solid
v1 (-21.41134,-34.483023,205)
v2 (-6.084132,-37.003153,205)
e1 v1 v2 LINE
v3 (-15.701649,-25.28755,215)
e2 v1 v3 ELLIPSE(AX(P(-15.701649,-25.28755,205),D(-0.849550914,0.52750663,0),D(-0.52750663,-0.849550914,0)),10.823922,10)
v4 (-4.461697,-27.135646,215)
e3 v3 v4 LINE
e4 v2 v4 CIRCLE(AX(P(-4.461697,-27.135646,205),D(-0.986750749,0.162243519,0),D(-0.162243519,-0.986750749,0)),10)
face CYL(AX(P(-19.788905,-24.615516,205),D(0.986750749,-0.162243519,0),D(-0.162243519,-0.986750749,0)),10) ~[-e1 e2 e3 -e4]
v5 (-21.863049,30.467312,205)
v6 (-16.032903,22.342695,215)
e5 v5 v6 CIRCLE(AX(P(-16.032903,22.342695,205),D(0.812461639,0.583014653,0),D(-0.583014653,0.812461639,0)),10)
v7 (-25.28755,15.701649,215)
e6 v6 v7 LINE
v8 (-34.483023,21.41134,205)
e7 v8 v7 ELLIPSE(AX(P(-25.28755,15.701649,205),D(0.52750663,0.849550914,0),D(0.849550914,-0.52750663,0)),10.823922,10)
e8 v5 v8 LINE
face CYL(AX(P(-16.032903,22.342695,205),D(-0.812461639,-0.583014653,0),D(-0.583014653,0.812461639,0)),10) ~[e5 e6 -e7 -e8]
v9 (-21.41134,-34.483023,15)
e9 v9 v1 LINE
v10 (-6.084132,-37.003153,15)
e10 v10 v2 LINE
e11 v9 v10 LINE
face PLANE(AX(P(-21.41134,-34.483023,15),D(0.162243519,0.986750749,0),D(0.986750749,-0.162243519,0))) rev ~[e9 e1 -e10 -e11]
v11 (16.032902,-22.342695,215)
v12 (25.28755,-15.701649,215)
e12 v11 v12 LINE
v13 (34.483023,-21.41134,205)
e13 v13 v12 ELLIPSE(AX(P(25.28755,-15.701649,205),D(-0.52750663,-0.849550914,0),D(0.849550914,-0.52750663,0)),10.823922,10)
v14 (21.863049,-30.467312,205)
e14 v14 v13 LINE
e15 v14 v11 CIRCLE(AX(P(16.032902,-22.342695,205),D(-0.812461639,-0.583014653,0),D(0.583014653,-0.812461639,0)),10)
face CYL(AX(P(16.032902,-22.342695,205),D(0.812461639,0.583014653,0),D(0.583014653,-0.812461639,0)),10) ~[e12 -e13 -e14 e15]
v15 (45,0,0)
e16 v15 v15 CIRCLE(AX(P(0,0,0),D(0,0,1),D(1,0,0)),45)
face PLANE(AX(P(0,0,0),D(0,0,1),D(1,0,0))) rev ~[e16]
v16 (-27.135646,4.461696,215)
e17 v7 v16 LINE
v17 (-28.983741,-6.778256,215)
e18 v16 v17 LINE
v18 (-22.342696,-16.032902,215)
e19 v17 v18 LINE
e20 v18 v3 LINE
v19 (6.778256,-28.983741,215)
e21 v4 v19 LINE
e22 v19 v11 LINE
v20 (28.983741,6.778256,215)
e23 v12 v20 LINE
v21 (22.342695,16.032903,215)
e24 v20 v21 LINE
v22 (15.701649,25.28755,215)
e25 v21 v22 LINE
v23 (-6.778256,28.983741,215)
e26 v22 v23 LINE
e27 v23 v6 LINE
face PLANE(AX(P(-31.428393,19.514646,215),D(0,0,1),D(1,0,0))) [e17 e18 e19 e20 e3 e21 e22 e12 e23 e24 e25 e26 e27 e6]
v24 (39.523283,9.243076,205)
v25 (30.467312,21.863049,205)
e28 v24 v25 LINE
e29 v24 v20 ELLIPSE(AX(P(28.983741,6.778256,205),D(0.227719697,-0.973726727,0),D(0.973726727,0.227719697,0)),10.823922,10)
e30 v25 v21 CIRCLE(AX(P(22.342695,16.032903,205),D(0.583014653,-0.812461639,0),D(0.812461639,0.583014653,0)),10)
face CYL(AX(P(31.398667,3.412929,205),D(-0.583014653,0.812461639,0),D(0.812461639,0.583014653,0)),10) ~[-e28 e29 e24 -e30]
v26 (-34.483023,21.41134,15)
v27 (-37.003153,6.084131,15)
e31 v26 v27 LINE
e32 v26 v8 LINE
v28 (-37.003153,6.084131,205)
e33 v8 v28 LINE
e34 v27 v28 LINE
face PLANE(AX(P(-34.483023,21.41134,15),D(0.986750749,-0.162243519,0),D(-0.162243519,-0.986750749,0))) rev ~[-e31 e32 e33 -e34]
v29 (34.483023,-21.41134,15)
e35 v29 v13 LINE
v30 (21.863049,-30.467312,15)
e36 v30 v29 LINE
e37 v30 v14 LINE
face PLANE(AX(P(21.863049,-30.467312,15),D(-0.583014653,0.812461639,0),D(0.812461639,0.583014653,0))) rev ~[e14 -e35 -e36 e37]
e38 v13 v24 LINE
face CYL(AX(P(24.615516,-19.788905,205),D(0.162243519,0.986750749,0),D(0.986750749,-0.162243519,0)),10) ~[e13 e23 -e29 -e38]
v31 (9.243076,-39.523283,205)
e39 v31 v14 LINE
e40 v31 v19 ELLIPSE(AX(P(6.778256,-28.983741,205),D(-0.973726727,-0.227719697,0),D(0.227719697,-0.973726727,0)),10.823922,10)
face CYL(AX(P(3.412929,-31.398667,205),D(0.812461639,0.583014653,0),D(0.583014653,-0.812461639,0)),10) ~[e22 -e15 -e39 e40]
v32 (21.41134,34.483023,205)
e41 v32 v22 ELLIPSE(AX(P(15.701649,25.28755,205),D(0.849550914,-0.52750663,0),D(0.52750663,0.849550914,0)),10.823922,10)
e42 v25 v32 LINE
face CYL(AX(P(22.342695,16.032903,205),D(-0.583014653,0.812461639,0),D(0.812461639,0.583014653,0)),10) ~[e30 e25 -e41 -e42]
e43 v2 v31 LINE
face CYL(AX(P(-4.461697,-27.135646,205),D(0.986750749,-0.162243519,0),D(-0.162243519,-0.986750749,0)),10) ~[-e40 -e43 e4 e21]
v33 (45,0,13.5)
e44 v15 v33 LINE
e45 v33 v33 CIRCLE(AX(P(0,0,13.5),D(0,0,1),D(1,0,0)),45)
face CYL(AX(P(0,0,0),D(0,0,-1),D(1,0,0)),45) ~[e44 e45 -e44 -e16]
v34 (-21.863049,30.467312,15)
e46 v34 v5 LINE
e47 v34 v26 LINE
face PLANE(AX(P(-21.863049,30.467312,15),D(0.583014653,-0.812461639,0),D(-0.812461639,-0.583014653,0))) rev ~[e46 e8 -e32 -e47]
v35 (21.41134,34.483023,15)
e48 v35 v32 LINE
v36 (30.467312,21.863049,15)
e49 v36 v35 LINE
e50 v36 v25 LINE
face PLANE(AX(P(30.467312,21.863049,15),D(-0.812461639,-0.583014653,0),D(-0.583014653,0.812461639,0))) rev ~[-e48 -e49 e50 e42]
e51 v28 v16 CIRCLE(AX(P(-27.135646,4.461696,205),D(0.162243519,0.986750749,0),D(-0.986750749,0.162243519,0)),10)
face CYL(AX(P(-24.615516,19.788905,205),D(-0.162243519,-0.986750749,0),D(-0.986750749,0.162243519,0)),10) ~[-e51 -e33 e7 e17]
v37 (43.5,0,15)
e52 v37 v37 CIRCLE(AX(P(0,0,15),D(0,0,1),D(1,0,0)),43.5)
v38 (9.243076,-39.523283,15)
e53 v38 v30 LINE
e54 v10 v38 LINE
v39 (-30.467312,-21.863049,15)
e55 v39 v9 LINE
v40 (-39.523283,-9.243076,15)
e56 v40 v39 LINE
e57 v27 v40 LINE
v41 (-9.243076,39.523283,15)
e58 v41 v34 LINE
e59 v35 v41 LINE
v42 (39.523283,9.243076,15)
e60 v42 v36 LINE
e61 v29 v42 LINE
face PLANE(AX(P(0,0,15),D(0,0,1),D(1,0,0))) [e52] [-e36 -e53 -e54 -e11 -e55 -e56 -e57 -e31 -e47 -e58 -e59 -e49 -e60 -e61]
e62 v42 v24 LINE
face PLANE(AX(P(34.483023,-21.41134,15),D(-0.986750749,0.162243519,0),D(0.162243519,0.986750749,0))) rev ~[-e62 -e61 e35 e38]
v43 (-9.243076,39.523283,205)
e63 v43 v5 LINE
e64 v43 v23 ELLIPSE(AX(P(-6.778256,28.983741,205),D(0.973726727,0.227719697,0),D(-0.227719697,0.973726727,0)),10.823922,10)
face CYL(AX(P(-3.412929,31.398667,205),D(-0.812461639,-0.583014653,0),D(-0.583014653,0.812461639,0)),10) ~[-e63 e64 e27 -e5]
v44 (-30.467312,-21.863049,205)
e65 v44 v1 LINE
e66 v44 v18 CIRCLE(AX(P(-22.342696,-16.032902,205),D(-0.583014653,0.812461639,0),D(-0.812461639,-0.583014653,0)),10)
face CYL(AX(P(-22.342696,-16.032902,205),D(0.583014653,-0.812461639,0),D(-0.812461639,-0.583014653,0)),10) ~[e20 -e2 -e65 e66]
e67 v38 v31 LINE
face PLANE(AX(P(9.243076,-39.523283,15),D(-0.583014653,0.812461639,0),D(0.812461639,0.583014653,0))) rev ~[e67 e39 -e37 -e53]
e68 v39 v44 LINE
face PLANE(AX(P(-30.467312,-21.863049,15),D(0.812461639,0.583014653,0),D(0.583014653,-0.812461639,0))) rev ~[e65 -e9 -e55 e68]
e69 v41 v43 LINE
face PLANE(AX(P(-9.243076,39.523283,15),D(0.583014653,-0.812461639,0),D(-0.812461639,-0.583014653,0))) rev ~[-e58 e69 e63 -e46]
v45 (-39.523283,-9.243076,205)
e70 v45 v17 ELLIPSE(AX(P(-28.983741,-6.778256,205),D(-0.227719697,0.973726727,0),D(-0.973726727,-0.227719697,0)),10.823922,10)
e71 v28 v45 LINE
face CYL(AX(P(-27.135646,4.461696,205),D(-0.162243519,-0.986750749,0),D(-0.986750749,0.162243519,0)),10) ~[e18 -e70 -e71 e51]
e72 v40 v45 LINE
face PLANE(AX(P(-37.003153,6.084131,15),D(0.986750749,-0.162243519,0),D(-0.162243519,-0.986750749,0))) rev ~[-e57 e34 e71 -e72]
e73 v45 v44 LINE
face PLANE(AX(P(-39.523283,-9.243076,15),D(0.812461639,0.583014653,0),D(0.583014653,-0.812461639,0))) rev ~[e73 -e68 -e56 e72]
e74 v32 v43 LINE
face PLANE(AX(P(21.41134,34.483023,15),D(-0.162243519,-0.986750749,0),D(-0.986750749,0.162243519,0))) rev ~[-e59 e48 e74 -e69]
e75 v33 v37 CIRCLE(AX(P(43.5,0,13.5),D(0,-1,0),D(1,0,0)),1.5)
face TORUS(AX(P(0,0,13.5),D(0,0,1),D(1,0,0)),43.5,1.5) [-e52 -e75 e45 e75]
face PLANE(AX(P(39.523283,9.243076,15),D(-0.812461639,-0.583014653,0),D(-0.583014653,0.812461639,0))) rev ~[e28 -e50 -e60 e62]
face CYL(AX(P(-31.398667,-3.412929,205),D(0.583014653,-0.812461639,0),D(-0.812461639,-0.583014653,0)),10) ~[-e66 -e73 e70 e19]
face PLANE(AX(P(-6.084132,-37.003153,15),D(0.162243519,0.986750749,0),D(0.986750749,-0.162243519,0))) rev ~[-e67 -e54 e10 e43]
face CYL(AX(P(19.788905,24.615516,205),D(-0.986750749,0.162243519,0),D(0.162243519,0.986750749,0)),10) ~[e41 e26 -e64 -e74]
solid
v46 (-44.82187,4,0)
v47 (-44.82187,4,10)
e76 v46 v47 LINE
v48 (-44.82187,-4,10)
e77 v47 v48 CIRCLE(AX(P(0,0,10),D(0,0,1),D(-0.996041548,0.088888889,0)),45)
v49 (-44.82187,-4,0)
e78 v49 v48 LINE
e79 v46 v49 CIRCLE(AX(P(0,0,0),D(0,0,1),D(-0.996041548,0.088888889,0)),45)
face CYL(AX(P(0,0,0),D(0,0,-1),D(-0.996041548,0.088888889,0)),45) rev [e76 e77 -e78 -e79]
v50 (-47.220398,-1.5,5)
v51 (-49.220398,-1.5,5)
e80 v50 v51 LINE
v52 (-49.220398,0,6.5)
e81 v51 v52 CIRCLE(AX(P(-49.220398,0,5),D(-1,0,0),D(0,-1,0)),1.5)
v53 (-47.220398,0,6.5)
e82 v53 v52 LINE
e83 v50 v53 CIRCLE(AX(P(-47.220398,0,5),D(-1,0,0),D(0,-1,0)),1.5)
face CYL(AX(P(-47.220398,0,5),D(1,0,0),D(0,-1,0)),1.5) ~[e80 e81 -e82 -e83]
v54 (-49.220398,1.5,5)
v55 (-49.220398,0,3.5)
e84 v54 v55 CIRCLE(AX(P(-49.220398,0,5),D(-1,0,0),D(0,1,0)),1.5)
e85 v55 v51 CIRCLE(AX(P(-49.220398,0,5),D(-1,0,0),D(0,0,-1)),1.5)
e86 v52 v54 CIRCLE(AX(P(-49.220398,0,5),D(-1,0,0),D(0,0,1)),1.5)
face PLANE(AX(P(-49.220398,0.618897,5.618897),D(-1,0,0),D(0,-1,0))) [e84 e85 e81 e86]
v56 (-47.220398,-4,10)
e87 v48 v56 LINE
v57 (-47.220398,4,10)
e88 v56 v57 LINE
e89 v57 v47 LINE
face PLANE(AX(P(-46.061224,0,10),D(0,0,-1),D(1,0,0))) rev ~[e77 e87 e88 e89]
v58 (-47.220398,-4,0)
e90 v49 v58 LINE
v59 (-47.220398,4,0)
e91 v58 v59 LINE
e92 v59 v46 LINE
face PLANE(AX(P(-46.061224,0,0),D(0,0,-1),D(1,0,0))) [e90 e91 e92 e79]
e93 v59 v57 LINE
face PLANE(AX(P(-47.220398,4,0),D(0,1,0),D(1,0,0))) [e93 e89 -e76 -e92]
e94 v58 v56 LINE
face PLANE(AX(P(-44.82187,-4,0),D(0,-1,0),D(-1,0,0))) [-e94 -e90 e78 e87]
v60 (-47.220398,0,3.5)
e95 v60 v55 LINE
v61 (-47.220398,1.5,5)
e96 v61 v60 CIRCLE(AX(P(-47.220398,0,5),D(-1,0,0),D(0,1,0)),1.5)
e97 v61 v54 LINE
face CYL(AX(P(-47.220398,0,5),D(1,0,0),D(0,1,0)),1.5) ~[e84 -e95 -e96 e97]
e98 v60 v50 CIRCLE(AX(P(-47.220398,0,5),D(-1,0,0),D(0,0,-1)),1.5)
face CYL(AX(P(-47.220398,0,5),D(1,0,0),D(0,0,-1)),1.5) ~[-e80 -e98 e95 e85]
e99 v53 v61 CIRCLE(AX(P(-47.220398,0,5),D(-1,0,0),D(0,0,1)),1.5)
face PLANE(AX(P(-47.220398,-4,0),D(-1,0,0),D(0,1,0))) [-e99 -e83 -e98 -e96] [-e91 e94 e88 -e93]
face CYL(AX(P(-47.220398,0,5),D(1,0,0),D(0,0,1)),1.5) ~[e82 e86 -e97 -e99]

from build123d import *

# Parameters (mm, degrees)
F0_R     = 45
F1_DEPTH = 15
F3_DEPTH = 200
F5_R     = 1.5
F7_DEPTH = 10
F9_DEPTH = 2
F10_R    = 10


with BuildPart() as f1:
    # F0 (on Top) → F1 (new body)
    with BuildSketch(Plane.XY):
        Circle(F0_R)
    extrude(amount=F1_DEPTH)

    # F2 (on face) → F3 (join)
    with BuildSketch(Plane.XY.offset(15)):
        with BuildLine():
            ThreePointArc((-37.0031531736, 6.0841314261), (-31.8581593507, 19.7814984969), (-21.8630493056, 30.4673115824))
            Line((-21.8630493056, 30.4673115824), (-34.4830231078, 21.4113398267))
            Line((-34.4830231078, 21.4113398267), (-37.0031531736, 6.0841314261))
        make_face()
        with BuildLine():
            ThreePointArc((-21.8630493056, 30.4673115824), (-8.5394884365, 36.5147523235), (6.08413213, 37.0031530579))
            Line((6.08413213, 37.0031530579), (-9.2430758896, 39.5232830611))
            Line((-9.2430758896, 39.5232830611), (-21.8630493056, 30.4673115824))
        make_face()
        with BuildLine():
            ThreePointArc((6.08413213, 37.0031530579), (19.7814989367, 31.8581590776), (30.4673117702, 21.863049044))
            Line((30.4673117702, 21.863049044), (21.4113398267, 34.4830231078))
            Line((21.4113398267, 34.4830231078), (6.08413213, 37.0031530579))
        make_face()
        with BuildLine():
            ThreePointArc((30.4673117702, 21.863049044), (35.6985587341, 11.483157419), (37.5, 0))
            ThreePointArc((37.5, 0), (37.3755819089, -3.0521921581), (37.0031532283, -6.0841310937))
            Line((37.0031532283, -6.0841310937), (39.5232830611, 9.2430758896))
            Line((39.5232830611, 9.2430758896), (30.4673117702, 21.863049044))
        make_face()
        with BuildLine():
            ThreePointArc((-30.4673118862, -21.8630488823), (-36.5147523015, -8.5394885302), (-37.0031531736, 6.0841314261))
            Line((-37.0031531736, 6.0841314261), (-39.5232830611, -9.2430758896))
            Line((-39.5232830611, -9.2430758896), (-30.4673118862, -21.8630488823))
        make_face()
        with BuildLine():
            Line((-21.4113398267, -34.4830231078), (-6.084131695, -37.0031531294))
            ThreePointArc((-6.084131695, -37.0031531294), (-19.781498834, -31.8581591414), (-30.4673118862, -21.8630488823))
            Line((-30.4673118862, -21.8630488823), (-21.4113398267, -34.4830231078))
        make_face()
        with BuildLine():
            Line((9.2430758896, -39.5232830611), (21.8630489822, -30.4673118145))
            ThreePointArc((21.8630489822, -30.4673118145), (8.5394884574, -36.5147523186), (-6.084131695, -37.0031531294))
            Line((-6.084131695, -37.0031531294), (9.2430758896, -39.5232830611))
        make_face()
        with BuildLine():
            Line((34.4830231078, -21.4113398267), (37.0031532283, -6.0841310937))
            ThreePointArc((37.0031532283, -6.0841310937), (31.8581593346, -19.7814985229), (21.8630489822, -30.4673118145))
            Line((21.8630489822, -30.4673118145), (34.4830231078, -21.4113398267))
        make_face()
        with BuildLine():
            ThreePointArc((37.0031532283, -6.0841310937), (37.3755819089, -3.0521921581), (37.5, 0))
            ThreePointArc((37.5, 0), (35.6985587341, 11.483157419), (30.4673117702, 21.863049044))
            ThreePointArc((30.4673117702, 21.863049044), (19.7814989367, 31.8581590776), (6.08413213, 37.0031530579))
            ThreePointArc((6.08413213, 37.0031530579), (-8.5394884365, 36.5147523235), (-21.8630493056, 30.4673115824))
            ThreePointArc((-21.8630493056, 30.4673115824), (-31.8581593507, 19.7814984969), (-37.0031531736, 6.0841314261))
            ThreePointArc((-37.0031531736, 6.0841314261), (-36.5147523015, -8.5394885302), (-30.4673118862, -21.8630488823))
            ThreePointArc((-30.4673118862, -21.8630488823), (-19.781498834, -31.8581591414), (-6.084131695, -37.0031531294))
            ThreePointArc((-6.084131695, -37.0031531294), (8.5394884574, -36.5147523186), (21.8630489822, -30.4673118145))
            ThreePointArc((21.8630489822, -30.4673118145), (31.8581593346, -19.7814985229), (37.0031532283, -6.0841310937))
        make_face()
    extrude(amount=F3_DEPTH)

    # F5
    f5_edges = [f1.edges().sort_by_distance(p)[0] for p in [
        (-45, 0, 15),
    ]]
    fillet(f5_edges, radius=F5_R)

    # F10
    f10_edges = [f1.edges().sort_by_distance(p)[0] for p in [
        (-37.003153, 6.084132, 215),
        (-30.467311, -21.863049, 215),
        (-6.084132, -37.003153, 215),
        (21.863049, -30.467311, 215),
        (37.003153, -6.084132, 215),
        (30.467311, 21.863049, 215),
        (6.084132, 37.003153, 215),
        (-21.863049, 30.467311, 215),
    ]]
    fillet(f10_edges, radius=F10_R)


with BuildPart() as f7:
    # F6 (on face) → F7 (new body)
    with BuildSketch(Plane(origin=(0, 0, 0), x_dir=(1, 0, 0), z_dir=(0, 0, -1))):
        with BuildLine():
            ThreePointArc((-44.821869662, -4), (-45, 0), (-44.821869662, 4))
            Line((-44.821869662, 4), (-47.2203977406, 4))
            Line((-47.2203977406, 4), (-47.2203977406, -4))
            Line((-47.2203977406, -4), (-44.821869662, -4))
        make_face()
    extrude(amount=-F7_DEPTH)

    # F8 (on face) → F9 (join)
    with BuildSketch(Plane(origin=(-47.2203977406, 0, 0), x_dir=(0, -1, 0), z_dir=(-1, 0, 0))):
        with BuildLine():
            Line((0, 5), (0, 6.5))
            ThreePointArc((0, 6.5), (-1.0606601718, 6.0606601718), (-1.5, 5))
            Line((-1.5, 5), (0, 5))
        make_face()
        with BuildLine():
            ThreePointArc((1.5, 5), (1.0606601718, 6.0606601718), (0, 6.5))
            Line((0, 6.5), (0, 5))
            Line((0, 5), (1.5, 5))
        make_face()
        with BuildLine():
            Line((1.5, 5), (0, 5))
            Line((0, 5), (0, 3.5))
            ThreePointArc((0, 3.5), (1.0606601718, 3.9393398282), (1.5, 5))
        make_face()
        with BuildLine():
            Line((0, 3.5), (0, 5))
            Line((0, 5), (-1.5, 5))
            ThreePointArc((-1.5, 5), (-1.0606601718, 3.9393398282), (0, 3.5))
        make_face()
    extrude(amount=F9_DEPTH)


solid = Compound([f1.part, f7.part])
